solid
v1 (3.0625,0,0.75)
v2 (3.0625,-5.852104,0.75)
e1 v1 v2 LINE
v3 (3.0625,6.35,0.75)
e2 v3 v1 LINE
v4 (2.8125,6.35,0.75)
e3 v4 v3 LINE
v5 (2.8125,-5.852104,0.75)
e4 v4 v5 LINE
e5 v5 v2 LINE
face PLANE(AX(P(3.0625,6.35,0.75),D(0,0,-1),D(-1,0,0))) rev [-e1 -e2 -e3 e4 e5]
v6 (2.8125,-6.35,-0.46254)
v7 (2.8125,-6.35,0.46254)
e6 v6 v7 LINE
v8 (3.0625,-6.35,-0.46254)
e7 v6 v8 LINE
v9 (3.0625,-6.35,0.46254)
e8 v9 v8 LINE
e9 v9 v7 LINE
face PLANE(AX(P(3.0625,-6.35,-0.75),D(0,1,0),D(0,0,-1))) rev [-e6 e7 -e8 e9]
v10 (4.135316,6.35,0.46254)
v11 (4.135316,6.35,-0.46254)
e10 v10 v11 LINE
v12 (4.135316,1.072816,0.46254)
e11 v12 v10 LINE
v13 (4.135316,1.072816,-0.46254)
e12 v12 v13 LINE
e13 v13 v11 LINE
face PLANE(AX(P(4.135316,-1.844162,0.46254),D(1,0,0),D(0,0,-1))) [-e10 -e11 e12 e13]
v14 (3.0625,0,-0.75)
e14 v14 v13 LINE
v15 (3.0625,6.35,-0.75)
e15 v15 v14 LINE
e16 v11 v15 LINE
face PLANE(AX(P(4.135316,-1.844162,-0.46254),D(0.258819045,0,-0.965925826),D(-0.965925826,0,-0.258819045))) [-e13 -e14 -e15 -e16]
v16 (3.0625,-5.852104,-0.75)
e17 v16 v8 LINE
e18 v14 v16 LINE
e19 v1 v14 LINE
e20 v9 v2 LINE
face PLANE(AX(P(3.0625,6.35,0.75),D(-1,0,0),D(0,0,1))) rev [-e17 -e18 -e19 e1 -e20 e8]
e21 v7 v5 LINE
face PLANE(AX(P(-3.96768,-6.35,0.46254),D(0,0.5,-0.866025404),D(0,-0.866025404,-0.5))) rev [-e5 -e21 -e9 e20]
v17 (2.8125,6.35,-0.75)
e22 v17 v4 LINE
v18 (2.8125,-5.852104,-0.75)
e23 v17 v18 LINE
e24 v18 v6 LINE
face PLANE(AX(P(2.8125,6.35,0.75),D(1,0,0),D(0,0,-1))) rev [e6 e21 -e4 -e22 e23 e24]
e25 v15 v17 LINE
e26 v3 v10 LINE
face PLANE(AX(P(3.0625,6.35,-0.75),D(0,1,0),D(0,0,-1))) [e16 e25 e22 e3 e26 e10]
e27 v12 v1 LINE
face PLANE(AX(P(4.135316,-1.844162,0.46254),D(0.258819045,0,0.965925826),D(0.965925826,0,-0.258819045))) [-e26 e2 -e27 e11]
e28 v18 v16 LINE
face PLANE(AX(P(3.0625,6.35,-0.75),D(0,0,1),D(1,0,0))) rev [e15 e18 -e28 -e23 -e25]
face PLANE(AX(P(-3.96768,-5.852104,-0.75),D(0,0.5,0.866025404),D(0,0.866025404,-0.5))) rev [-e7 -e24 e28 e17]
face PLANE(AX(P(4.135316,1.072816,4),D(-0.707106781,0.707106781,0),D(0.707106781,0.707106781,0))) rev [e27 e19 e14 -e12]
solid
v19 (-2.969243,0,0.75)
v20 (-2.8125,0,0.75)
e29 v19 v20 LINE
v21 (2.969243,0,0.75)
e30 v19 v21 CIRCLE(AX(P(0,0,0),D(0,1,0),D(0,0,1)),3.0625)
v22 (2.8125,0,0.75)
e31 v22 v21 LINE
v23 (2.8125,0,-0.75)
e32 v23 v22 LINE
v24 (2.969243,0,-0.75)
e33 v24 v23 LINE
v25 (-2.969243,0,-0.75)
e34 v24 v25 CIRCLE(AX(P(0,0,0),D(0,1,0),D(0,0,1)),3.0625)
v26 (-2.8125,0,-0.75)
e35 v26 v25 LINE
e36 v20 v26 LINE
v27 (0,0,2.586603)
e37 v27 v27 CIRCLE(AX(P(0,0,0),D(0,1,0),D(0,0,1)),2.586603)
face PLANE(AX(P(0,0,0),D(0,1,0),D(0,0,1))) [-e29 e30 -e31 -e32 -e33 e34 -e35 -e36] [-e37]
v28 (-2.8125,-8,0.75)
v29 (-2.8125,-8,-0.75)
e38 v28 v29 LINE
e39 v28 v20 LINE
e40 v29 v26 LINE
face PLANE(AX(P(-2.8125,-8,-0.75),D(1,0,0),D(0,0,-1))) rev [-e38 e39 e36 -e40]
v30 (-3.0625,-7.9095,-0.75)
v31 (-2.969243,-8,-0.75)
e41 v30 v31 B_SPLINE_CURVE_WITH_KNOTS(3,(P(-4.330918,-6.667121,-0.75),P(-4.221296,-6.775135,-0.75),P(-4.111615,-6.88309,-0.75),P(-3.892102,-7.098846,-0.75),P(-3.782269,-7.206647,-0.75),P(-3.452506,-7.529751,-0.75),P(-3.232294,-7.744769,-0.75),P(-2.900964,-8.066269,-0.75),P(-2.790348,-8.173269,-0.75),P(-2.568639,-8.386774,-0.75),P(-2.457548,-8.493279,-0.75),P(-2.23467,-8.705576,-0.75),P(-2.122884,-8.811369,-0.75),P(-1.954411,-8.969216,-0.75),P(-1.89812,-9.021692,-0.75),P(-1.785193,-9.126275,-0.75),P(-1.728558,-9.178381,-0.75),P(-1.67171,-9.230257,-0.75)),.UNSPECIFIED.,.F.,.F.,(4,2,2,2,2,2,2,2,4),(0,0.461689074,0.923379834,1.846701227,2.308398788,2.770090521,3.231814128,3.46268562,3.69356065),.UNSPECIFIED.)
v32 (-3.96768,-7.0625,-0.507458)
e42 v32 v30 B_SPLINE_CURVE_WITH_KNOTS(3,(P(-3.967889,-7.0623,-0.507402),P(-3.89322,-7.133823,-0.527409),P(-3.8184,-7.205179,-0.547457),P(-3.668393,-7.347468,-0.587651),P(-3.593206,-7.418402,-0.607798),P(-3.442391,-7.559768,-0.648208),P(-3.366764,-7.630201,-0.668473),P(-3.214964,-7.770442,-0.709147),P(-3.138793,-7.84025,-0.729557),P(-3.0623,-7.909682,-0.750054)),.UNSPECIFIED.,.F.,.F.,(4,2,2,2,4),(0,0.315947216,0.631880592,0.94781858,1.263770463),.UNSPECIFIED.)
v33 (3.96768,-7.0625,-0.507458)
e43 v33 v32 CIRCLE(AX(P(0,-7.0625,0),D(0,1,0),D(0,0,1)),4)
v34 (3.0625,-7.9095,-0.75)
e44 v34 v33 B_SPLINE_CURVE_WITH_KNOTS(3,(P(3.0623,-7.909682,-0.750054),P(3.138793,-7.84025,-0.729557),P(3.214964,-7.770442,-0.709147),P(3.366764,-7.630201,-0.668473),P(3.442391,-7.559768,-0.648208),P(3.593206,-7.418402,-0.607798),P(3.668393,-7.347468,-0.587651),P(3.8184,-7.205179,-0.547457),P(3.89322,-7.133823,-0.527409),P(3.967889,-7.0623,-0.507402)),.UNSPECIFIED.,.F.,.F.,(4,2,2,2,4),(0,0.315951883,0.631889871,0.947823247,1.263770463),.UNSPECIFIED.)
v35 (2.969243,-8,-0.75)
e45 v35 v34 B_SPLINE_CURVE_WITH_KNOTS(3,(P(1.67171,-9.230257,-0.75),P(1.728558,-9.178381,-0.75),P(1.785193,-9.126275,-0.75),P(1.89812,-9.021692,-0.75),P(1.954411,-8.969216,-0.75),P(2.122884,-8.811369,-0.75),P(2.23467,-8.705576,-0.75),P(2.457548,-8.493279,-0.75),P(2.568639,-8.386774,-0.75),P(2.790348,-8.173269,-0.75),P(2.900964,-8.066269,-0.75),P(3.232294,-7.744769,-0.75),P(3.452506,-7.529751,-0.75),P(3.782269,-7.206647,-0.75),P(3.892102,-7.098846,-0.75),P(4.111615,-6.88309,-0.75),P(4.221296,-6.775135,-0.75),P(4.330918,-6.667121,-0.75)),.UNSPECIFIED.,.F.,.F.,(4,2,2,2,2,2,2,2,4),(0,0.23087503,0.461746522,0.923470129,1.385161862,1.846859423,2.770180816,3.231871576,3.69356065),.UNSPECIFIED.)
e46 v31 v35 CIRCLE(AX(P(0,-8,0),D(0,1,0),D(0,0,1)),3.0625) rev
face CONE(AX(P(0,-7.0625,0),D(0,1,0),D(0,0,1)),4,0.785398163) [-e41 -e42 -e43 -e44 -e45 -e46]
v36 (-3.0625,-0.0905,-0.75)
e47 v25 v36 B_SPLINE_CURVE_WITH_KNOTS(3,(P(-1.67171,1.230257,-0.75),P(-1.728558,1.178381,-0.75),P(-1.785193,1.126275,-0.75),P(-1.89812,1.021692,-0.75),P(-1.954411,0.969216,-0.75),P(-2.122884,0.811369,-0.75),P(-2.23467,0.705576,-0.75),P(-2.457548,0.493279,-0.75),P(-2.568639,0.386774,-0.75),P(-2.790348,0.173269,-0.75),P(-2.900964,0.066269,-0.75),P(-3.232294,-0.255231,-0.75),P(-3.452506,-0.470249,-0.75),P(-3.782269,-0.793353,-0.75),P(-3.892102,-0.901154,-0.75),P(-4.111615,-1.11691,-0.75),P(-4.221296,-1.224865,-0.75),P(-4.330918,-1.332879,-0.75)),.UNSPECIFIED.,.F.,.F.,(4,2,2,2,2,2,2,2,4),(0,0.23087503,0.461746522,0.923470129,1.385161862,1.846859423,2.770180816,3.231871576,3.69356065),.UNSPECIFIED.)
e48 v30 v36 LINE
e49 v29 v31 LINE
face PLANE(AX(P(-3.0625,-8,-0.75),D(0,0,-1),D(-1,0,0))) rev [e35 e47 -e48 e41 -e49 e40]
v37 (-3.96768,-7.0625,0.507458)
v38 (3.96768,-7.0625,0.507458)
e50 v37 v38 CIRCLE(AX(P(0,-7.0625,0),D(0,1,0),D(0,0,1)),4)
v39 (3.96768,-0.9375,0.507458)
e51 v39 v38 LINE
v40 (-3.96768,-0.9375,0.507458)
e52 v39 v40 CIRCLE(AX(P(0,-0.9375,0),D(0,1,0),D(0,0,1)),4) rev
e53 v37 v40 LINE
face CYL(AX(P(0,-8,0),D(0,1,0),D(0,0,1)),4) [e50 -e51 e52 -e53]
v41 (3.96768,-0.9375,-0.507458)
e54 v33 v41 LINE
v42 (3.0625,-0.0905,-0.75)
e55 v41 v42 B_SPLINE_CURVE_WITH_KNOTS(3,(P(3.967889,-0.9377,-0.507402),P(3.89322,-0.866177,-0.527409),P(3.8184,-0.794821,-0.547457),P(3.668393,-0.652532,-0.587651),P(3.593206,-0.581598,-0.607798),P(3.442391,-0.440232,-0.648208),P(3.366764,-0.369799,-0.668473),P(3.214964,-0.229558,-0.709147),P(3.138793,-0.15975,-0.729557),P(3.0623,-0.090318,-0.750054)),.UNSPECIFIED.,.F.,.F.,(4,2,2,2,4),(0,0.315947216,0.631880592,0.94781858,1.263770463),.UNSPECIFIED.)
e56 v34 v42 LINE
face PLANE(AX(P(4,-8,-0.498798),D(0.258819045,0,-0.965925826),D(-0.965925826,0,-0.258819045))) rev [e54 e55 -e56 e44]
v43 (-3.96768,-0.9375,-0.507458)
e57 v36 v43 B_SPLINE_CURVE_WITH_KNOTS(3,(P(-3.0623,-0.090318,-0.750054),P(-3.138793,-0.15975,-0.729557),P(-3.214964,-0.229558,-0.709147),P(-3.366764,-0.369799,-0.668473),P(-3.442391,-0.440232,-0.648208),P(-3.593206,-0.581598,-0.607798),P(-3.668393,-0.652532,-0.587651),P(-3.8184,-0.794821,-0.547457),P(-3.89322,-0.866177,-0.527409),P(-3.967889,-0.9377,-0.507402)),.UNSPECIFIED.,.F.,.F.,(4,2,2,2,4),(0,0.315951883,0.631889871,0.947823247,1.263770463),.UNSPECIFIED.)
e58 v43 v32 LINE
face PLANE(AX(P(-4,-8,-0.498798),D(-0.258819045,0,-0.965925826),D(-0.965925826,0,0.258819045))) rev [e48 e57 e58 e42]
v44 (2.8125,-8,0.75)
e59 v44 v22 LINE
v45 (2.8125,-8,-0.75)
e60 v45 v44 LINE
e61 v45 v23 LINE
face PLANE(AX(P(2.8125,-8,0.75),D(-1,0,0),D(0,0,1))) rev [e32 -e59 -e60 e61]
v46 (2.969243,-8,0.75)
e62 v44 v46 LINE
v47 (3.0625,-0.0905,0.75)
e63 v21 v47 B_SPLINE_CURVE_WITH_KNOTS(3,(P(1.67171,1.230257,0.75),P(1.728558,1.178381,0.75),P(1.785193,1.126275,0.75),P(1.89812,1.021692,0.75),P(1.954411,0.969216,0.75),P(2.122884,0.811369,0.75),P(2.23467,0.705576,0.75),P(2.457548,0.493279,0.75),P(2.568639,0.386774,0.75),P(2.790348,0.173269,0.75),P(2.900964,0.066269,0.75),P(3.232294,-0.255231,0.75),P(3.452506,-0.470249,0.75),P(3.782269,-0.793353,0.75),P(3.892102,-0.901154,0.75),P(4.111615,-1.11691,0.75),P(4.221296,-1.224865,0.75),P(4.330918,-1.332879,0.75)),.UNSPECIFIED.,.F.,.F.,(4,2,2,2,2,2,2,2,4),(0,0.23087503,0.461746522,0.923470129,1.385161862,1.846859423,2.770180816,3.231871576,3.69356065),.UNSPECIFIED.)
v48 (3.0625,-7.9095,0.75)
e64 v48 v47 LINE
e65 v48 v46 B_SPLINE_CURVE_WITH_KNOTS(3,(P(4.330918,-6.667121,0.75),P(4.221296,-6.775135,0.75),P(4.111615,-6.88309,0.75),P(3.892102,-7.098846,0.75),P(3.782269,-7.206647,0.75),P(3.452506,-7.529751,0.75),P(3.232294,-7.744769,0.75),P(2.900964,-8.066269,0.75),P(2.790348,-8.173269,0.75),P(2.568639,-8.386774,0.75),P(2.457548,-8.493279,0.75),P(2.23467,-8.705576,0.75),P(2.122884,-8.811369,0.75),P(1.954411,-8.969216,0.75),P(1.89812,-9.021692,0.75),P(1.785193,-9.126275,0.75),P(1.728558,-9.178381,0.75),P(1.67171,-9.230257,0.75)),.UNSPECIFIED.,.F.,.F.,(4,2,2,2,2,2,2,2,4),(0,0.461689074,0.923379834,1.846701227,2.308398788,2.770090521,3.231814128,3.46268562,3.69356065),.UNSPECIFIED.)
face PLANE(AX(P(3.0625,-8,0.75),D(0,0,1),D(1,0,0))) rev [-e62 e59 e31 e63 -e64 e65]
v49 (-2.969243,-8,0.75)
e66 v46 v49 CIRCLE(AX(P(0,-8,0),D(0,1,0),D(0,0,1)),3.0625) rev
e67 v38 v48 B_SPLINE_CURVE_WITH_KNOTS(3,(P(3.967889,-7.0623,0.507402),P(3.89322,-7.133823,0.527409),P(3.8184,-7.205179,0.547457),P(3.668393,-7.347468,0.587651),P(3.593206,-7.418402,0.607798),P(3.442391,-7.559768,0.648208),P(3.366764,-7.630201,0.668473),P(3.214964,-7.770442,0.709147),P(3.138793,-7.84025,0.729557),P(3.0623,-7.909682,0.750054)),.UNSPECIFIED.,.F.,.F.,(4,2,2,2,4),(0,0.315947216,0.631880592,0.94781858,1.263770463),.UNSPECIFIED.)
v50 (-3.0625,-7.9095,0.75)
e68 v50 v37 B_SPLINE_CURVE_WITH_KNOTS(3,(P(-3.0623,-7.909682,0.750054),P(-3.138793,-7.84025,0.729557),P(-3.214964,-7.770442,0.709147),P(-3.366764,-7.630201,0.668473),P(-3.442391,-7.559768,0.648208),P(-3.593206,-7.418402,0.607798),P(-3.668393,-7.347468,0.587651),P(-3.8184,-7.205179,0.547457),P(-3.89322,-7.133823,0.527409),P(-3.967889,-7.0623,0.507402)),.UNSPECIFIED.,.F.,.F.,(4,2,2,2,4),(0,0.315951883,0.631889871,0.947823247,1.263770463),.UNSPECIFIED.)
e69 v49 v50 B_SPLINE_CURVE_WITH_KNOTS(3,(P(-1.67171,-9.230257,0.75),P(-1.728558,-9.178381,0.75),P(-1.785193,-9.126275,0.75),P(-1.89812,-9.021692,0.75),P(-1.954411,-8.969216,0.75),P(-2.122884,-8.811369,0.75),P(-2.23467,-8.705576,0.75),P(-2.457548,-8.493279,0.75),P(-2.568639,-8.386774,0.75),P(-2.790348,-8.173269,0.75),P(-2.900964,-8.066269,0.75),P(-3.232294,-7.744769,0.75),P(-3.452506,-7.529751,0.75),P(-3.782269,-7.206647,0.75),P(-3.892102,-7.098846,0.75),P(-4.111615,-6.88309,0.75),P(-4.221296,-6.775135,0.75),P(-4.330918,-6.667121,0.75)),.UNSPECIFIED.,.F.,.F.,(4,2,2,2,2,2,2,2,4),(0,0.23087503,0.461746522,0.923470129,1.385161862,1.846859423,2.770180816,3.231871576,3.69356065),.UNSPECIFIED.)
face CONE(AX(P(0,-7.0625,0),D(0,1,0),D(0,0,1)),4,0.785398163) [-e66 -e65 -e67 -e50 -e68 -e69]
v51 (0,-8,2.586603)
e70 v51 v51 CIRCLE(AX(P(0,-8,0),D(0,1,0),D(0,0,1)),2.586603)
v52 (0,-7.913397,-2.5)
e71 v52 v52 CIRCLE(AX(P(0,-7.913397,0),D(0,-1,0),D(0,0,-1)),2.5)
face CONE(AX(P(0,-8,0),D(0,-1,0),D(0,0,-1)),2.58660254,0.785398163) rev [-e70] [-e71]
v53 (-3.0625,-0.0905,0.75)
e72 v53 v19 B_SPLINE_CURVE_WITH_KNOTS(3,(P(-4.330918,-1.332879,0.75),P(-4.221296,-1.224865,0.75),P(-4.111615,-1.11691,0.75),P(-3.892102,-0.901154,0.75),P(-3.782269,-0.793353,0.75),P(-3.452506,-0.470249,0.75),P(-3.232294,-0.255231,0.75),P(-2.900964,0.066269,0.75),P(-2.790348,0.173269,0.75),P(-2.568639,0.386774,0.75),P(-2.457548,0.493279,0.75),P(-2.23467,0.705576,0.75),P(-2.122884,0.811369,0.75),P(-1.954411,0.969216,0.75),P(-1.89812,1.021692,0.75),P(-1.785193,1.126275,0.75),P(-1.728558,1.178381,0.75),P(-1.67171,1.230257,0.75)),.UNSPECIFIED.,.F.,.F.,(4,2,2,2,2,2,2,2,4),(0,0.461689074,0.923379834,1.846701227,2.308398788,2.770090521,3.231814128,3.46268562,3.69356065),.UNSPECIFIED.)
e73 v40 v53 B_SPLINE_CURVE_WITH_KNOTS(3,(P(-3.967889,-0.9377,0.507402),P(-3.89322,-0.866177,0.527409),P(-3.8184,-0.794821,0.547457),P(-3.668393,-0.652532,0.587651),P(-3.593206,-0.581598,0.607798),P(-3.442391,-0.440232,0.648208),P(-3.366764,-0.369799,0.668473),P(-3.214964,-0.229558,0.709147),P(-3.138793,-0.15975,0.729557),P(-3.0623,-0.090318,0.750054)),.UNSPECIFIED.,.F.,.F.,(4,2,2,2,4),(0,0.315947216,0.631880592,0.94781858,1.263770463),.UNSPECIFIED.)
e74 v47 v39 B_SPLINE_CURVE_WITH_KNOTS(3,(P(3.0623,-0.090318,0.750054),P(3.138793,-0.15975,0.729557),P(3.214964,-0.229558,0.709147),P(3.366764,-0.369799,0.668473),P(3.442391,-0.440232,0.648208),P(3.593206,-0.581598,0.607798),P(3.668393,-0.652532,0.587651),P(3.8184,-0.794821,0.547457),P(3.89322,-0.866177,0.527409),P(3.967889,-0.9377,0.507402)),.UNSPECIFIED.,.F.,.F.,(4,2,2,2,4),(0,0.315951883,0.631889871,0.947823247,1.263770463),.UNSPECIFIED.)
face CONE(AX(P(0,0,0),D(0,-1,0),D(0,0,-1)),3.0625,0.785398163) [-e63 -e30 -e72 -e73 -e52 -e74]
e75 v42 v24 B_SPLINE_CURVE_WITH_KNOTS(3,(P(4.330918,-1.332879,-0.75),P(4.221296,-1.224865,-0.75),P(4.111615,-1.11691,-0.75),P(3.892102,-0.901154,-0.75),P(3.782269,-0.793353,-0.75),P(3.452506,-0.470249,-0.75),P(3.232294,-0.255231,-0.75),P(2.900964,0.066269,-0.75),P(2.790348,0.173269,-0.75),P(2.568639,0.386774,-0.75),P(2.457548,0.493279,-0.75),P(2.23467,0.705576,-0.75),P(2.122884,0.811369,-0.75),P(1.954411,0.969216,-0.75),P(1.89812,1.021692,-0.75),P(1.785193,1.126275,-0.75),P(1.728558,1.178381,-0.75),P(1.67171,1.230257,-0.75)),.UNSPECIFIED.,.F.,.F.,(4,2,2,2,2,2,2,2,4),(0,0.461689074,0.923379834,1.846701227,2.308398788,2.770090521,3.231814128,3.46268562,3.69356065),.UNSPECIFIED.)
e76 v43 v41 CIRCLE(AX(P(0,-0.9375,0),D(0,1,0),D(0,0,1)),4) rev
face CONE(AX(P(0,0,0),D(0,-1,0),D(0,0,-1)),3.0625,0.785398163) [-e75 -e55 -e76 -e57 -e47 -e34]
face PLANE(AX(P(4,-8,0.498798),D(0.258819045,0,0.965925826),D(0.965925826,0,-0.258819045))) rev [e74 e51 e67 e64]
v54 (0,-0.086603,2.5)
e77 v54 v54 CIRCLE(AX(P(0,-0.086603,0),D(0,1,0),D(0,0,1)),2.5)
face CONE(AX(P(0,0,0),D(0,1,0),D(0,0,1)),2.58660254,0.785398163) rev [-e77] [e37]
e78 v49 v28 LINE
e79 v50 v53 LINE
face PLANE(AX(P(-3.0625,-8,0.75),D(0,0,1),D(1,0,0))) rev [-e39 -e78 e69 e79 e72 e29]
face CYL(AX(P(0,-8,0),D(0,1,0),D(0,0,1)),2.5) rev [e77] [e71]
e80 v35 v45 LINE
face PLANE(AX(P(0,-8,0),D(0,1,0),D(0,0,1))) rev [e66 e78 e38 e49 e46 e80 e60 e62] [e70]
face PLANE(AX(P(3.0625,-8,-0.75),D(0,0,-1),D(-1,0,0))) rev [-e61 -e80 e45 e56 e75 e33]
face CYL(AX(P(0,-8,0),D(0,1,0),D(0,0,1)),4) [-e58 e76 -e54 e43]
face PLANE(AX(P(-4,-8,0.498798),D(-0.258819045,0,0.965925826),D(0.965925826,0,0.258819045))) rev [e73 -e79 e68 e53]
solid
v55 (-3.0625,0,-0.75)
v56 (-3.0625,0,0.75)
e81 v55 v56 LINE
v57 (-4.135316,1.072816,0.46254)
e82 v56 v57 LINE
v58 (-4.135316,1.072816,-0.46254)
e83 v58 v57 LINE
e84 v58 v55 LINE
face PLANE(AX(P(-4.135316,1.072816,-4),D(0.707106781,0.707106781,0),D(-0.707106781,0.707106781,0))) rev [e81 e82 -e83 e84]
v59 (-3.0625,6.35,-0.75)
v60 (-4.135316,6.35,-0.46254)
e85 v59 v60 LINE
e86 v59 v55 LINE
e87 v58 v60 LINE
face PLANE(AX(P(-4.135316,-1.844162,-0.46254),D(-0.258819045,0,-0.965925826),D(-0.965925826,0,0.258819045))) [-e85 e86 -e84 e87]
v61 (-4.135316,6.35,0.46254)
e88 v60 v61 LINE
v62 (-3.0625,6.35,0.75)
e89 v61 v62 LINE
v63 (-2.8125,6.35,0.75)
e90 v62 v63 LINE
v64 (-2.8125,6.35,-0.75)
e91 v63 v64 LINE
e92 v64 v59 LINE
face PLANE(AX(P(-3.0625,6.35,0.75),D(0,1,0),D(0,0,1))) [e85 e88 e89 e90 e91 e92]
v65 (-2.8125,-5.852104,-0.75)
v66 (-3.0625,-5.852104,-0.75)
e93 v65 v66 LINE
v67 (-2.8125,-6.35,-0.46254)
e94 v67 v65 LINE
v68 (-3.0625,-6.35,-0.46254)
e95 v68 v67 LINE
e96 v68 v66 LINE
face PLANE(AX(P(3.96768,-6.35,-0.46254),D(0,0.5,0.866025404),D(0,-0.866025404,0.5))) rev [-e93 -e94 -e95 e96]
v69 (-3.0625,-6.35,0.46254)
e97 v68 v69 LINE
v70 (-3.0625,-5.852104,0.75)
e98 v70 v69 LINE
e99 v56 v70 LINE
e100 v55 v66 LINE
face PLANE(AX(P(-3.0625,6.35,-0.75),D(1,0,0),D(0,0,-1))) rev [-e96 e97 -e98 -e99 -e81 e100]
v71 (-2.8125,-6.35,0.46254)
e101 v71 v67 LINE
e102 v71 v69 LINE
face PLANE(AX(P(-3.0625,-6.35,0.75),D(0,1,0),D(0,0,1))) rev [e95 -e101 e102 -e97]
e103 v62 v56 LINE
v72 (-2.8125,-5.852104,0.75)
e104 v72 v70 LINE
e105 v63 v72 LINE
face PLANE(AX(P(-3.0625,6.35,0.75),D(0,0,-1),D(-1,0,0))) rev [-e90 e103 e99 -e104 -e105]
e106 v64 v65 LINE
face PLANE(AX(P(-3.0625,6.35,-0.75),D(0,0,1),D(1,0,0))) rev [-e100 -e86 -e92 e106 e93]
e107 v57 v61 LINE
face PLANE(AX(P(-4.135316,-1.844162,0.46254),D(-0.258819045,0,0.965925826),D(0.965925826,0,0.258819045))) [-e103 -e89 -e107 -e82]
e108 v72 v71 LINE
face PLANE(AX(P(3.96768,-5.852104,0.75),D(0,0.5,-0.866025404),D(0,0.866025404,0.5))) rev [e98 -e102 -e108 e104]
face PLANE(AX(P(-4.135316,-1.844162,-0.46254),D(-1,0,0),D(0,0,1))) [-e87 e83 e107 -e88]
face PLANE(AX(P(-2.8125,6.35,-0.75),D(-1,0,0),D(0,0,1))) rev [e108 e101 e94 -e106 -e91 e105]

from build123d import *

# Parameters (mm, degrees)
SKETCH3_R           = 4
EXTRUDE1_DEPTH      = 8
CHAMFER1_SIZE       = 0.9375
EXTRUDE2_DEPTH      = 10.797958971
CIRPATTERN1_COUNT   = 2
SKETCH6_R           = 2.5
EXTRUDE3_DEPTH      = 10.784808976
SKETCH12_W          = 0.25
SKETCH12_H          = 1.5
EXTRUDE6_DEPTH      = 6.35
EXTRUDE7_DEPTH      = 6.35
EXTRUDE8_DEPTH      = 10.853975964
EXTRUDE8_DEPTH_BACK = 10.853975964
EXTRUDE9_DEPTH      = 12.376442088
CIRPATTERN2_COUNT   = 2


# Read off the part's stored shape, not the designer's step: Extrude4, Extrude5
with BuildPart() as part:
    # Sketch3 → Extrude1 (new body)
    with BuildSketch(Plane(origin=(0, 0, 0), x_dir=(1, 0, 0), z_dir=(0, 1, 0))):
        with Locations(Location((0, 0, 0), (0, 0, 270))):
            Circle(SKETCH3_R)
    extrude(amount=-EXTRUDE1_DEPTH)

    # Chamfer1
    chamfer1_edges = [part.edges().sort_by_distance(p)[0] for p in [
        (0, 0, -4),
        (0, -8, -4),
    ]]
    chamfer(chamfer1_edges, length=CHAMFER1_SIZE)

    # Sketch11 → Extrude2 (cut, through all)
    with BuildSketch(Plane(origin=(0, 0, 0), x_dir=(1, 0, 0), z_dir=(0, 1, 0))):
        Polygon((-4, 0.498797632), (-3.0625, 0.75), (-2.8125, 0.75), (-2.8125, -0.75), (-3.0625, -0.75), (-4, -0.498797632), align=None)
    extrude2 = extrude(amount=-EXTRUDE2_DEPTH, mode=Mode.SUBTRACT)

    # CirPattern1: Extrude2 ×2 about axis
    cirpattern1_axis = Axis((0, 0, 0), (0, 1, 0))
    for i in range(1, CIRPATTERN1_COUNT):
        add(extrude2.rotate(cirpattern1_axis, i * 360 / CIRPATTERN1_COUNT), mode=Mode.SUBTRACT)

    # Sketch6 → Extrude3 (cut, through all)
    with BuildSketch(Plane(origin=(0, 0, 0), x_dir=(1, 0, 0), z_dir=(0, 1, 0))):
        with Locations(Location((0, 0, 0), (0, 0, 270))):
            Circle(SKETCH6_R)
    extrude(amount=-EXTRUDE3_DEPTH, mode=Mode.SUBTRACT)

    # Extrude4 outline → Extrude4 (revolve, cut)
    with BuildSketch(Plane.XY):
        Polygon((2.5, 0), (2.5, -0.08660254), (2.58660254, 0), align=None)
    revolve(axis=Axis((0, 0, 0), (0, 1, 0)), mode=Mode.SUBTRACT)

    # Extrude5 outline → Extrude5 (revolve, cut)
    with BuildSketch(Plane.XY):
        Polygon((2.58660254, -8), (2.5, -7.91339746), (2.5, -8), align=None)
    revolve(axis=Axis((0, 0, 0), (0, 1, 0)), mode=Mode.SUBTRACT)


with BuildPart() as body_2:
    # Sketch12 → Extrude6 (new, symmetric)
    with BuildSketch(Plane(origin=(0, 0, 0), x_dir=(1, 0, 0), z_dir=(0, 1, 0))):
        with Locations((-2.9375, 0)):
            Rectangle(SKETCH12_W, SKETCH12_H)
    extrude(amount=EXTRUDE6_DEPTH, both=True)

    # Sketch13 → Extrude7 (add)
    with BuildSketch(Plane(origin=(0, 6.35, 0), x_dir=(1, 0, 0), z_dir=(0, 1, 0))):
        Polygon((-4.135316469, 0.462539693), (-3.0625, 0.75), (-3.0625, -0.75), (-4.135316469, -0.462539693), align=None)
    extrude(amount=-EXTRUDE7_DEPTH)

    # Sketch14 → Extrude8 (cut, two sides: drawn at the far end of the back side and taken through both)
    with BuildSketch(Plane.XY.offset(-EXTRUDE8_DEPTH_BACK)):
        Polygon((-4.135316469, 0), (-4.135316469, 1.072816469), (-3.0625, 0), align=None)
    extrude(amount=EXTRUDE8_DEPTH + EXTRUDE8_DEPTH_BACK, mode=Mode.SUBTRACT)

    # Sketch15 → Extrude9 (cut, through all)
    with BuildSketch(Plane.ZY.offset(3.0625)):
        Polygon((-0.462539693, -6.35), (-0.75, -5.852104144), (-0.75, -6.35), align=None)
        Polygon((0.462539693, -6.35), (0.75, -6.35), (0.75, -5.852104144), align=None)
    extrude(amount=-EXTRUDE9_DEPTH, mode=Mode.SUBTRACT)


with BuildPart() as cirpattern2_1:
    # CirPattern2: pattern copy
    add(body_2.part.rotate(Axis((0, 0, 0), (0, 1, 0)), 1 * 360 / CIRPATTERN2_COUNT))


solid = Compound([part.part, body_2.part, cirpattern2_1.part])
